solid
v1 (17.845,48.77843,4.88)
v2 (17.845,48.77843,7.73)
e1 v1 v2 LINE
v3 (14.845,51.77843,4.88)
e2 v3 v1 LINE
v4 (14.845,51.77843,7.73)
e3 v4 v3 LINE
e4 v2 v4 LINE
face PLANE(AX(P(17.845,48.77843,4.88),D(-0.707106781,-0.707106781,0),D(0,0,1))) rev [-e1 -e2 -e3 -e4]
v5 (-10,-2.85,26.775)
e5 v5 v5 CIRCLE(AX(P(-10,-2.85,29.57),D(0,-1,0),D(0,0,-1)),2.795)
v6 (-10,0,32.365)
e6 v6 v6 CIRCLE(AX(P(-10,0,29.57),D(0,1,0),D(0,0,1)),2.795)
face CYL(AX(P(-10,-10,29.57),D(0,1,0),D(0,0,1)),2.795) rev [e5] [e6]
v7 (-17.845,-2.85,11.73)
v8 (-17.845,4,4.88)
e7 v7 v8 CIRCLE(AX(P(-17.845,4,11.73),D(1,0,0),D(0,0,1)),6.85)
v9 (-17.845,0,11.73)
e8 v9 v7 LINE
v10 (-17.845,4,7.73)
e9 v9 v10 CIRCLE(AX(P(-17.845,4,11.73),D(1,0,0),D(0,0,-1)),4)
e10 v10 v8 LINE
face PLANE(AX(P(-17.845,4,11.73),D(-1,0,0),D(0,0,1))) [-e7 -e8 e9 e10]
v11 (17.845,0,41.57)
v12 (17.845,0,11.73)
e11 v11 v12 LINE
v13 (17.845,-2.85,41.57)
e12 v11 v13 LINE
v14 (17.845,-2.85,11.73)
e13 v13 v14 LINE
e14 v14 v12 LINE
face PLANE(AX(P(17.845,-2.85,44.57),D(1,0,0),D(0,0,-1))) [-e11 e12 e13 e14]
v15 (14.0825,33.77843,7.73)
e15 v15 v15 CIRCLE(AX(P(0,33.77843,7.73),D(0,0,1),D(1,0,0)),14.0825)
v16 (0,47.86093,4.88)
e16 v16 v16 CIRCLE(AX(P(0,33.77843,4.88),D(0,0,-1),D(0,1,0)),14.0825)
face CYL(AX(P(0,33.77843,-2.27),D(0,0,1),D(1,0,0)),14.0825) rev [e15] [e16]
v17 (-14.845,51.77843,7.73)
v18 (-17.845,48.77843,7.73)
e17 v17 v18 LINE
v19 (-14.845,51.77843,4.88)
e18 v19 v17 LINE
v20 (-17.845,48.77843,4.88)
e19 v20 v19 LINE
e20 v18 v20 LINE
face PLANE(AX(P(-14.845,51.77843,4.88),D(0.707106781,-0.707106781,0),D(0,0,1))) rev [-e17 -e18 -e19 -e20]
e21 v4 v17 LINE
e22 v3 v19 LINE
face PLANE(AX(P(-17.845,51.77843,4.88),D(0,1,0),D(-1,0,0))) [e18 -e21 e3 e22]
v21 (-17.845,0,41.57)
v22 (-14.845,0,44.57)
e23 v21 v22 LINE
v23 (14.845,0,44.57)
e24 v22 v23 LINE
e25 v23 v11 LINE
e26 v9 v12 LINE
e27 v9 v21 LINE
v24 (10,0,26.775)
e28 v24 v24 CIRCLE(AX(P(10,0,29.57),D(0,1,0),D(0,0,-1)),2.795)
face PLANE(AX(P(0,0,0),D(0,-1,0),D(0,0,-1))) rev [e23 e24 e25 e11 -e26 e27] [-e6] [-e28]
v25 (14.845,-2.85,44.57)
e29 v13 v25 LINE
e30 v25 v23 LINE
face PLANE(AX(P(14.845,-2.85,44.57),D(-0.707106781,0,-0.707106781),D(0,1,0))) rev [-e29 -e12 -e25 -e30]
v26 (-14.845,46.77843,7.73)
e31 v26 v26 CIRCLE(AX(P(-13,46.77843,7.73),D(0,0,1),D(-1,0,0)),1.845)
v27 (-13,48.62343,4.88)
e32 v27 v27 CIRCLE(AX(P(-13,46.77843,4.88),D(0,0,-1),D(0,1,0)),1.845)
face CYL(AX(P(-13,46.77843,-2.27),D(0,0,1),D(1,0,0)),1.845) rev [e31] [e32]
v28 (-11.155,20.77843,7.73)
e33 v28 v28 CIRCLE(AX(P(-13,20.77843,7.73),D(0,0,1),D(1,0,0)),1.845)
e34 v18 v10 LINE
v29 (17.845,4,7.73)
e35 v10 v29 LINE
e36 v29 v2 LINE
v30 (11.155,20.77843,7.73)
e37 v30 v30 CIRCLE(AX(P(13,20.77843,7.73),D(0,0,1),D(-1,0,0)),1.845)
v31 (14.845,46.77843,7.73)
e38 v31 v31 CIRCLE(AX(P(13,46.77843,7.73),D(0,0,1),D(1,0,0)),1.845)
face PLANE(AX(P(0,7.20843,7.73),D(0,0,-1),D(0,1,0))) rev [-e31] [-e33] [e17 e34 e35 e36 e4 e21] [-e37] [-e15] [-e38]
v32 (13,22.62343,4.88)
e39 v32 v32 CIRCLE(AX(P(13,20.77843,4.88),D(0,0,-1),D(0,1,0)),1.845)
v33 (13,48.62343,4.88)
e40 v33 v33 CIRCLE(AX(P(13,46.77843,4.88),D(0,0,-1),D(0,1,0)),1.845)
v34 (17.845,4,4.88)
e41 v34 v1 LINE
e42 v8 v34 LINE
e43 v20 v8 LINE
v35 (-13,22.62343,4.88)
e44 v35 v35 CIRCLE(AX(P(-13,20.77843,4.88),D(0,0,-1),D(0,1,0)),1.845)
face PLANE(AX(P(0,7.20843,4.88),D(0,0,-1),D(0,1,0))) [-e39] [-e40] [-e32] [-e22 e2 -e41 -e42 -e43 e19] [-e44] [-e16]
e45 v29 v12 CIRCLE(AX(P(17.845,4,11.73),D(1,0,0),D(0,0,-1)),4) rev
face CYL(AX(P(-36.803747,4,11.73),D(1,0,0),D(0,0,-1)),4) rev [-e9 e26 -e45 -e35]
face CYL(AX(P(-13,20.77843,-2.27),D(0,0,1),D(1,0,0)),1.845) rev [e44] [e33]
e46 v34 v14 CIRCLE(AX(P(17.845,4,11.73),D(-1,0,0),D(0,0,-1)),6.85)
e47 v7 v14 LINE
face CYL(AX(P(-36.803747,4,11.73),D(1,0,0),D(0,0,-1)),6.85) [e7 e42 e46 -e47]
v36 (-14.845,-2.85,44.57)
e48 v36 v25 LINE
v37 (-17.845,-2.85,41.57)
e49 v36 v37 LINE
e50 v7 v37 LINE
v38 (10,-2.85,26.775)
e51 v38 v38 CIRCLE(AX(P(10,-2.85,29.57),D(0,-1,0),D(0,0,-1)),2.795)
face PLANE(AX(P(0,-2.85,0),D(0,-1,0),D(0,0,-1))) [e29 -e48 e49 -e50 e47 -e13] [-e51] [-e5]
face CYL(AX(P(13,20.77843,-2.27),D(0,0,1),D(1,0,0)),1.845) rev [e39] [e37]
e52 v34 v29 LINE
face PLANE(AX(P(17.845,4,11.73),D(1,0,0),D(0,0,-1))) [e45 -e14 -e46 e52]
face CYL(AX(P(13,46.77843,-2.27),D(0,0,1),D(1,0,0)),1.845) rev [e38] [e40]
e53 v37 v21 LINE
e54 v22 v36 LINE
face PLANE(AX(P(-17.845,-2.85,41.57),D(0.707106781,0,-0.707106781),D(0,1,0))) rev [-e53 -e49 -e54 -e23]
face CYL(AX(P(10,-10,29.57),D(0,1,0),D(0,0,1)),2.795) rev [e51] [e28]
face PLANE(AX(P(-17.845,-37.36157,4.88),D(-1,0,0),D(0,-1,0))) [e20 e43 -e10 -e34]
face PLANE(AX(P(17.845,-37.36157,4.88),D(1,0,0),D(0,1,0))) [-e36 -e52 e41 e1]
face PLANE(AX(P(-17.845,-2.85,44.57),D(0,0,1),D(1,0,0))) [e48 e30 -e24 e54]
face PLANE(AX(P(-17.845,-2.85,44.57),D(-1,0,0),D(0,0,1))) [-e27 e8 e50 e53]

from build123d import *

# Parameters (mm, degrees)
SKETCH_1_W             = 35.69
SKETCH_1_H             = 89.14
SM_BASE_FLANGE_1_DEPTH = 2.85
OTHER_START            = -17.845
OTHER_1_DEPTH          = 35.69
OTHER_1_2_DEPTH        = 35.69
SKETCH_7_R             = 14.0825
SKETCH_7_R_2           = 1.845
CUT_EXTRUDE_1_DEPTH    = 10
CHAMFER_1_SIZE         = 3
SKETCH_8_R             = 2.795
CUT_EXTRUDE_2_DEPTH    = 10


# Read off the part's stored shape, not the designer's step: Нарисованный сгиб1
# Sheet-metal steps are written as plain solids
with BuildPart() as part:
    # Sketch 1 → Базовая кромка1 (new body)
    with BuildSketch(Plane(origin=(0, 0, 0), x_dir=(1, 0, 0), z_dir=(0, 1, 0))):
        Rectangle(SKETCH_1_W, SKETCH_1_H)
    extrude(amount=-SM_BASE_FLANGE_1_DEPTH)

    # Other 1 outline → Other 1 (cut)
    with BuildSketch(Plane.YZ.offset(OTHER_START)):
        with BuildLine():
            Line((0, -44.57), (0, 6.169199698))
            ThreePointArc((0, 6.169199698), (-2.096002789, 8.605700079), (-2.85, 11.73))
            Line((-2.85, 11.73), (-2.85, -44.57))
            Line((-2.85, -44.57), (0, -44.57))
        make_face()
    extrude(amount=OTHER_1_DEPTH, mode=Mode.SUBTRACT)

    # Other 1 2 outline → Other 1 2 (add)
    with BuildSketch(Plane.YZ.offset(OTHER_START)):
        with BuildLine():
            Line((51.778429927, 7.73), (4, 7.73))
            ThreePointArc((4, 7.73), (1.171572875, 8.901572875), (0, 11.73))
            Line((0, 11.73), (0, 6.169199698))
            ThreePointArc((0, 6.169199698), (1.898688751, 5.210261429), (4, 4.88))
            Line((4, 4.88), (51.778429927, 4.88))
            Line((51.778429927, 4.88), (51.778429927, 7.73))
        make_face()
    extrude(amount=OTHER_1_2_DEPTH)

    # Эскиз7 → Вырез-Вытянуть1 (cut)
    with BuildSketch(Plane.XY.offset(7.73)):
        with Locations((0, 33.778429927)):
            Circle(SKETCH_7_R)
        with Locations((13, 46.778429927)):
            Circle(SKETCH_7_R_2)
        with Locations(Location((-13, 46.778429927, 0), (0, 0, 90))):
            Circle(SKETCH_7_R_2)
        with Locations((-13, 20.778429927)):
            Circle(SKETCH_7_R_2)
        with Locations(Location((13, 20.778429927, 0), (0, 0, 90))):
            Circle(SKETCH_7_R_2)
    extrude(amount=-CUT_EXTRUDE_1_DEPTH, mode=Mode.SUBTRACT)

    # Фаска1
    chamfer_1_edges = [part.edges().sort_by_distance(p)[0] for p in [
        (17.845, -1.425, 44.57),
        (-17.845, -1.425, 44.57),
        (-17.845, 51.778429927, 6.305),
        (17.845, 51.778429927, 6.305),
    ]]
    chamfer(chamfer_1_edges, length=CHAMFER_1_SIZE)

    # Эскиз8 → Вырез-Вытянуть2 (cut)
    with BuildSketch(Plane(origin=(0, 0, 0), x_dir=(1, 0, 0), z_dir=(0, 1, 0))):
        with Locations(Location((-10, -29.57, 0), (0, 0, 270))):
            Circle(SKETCH_8_R)
        with Locations(Location((10, -29.57, 0), (0, 0, 90))):
            Circle(SKETCH_8_R)
    extrude(amount=-CUT_EXTRUDE_2_DEPTH, mode=Mode.SUBTRACT)


solid = part.part
